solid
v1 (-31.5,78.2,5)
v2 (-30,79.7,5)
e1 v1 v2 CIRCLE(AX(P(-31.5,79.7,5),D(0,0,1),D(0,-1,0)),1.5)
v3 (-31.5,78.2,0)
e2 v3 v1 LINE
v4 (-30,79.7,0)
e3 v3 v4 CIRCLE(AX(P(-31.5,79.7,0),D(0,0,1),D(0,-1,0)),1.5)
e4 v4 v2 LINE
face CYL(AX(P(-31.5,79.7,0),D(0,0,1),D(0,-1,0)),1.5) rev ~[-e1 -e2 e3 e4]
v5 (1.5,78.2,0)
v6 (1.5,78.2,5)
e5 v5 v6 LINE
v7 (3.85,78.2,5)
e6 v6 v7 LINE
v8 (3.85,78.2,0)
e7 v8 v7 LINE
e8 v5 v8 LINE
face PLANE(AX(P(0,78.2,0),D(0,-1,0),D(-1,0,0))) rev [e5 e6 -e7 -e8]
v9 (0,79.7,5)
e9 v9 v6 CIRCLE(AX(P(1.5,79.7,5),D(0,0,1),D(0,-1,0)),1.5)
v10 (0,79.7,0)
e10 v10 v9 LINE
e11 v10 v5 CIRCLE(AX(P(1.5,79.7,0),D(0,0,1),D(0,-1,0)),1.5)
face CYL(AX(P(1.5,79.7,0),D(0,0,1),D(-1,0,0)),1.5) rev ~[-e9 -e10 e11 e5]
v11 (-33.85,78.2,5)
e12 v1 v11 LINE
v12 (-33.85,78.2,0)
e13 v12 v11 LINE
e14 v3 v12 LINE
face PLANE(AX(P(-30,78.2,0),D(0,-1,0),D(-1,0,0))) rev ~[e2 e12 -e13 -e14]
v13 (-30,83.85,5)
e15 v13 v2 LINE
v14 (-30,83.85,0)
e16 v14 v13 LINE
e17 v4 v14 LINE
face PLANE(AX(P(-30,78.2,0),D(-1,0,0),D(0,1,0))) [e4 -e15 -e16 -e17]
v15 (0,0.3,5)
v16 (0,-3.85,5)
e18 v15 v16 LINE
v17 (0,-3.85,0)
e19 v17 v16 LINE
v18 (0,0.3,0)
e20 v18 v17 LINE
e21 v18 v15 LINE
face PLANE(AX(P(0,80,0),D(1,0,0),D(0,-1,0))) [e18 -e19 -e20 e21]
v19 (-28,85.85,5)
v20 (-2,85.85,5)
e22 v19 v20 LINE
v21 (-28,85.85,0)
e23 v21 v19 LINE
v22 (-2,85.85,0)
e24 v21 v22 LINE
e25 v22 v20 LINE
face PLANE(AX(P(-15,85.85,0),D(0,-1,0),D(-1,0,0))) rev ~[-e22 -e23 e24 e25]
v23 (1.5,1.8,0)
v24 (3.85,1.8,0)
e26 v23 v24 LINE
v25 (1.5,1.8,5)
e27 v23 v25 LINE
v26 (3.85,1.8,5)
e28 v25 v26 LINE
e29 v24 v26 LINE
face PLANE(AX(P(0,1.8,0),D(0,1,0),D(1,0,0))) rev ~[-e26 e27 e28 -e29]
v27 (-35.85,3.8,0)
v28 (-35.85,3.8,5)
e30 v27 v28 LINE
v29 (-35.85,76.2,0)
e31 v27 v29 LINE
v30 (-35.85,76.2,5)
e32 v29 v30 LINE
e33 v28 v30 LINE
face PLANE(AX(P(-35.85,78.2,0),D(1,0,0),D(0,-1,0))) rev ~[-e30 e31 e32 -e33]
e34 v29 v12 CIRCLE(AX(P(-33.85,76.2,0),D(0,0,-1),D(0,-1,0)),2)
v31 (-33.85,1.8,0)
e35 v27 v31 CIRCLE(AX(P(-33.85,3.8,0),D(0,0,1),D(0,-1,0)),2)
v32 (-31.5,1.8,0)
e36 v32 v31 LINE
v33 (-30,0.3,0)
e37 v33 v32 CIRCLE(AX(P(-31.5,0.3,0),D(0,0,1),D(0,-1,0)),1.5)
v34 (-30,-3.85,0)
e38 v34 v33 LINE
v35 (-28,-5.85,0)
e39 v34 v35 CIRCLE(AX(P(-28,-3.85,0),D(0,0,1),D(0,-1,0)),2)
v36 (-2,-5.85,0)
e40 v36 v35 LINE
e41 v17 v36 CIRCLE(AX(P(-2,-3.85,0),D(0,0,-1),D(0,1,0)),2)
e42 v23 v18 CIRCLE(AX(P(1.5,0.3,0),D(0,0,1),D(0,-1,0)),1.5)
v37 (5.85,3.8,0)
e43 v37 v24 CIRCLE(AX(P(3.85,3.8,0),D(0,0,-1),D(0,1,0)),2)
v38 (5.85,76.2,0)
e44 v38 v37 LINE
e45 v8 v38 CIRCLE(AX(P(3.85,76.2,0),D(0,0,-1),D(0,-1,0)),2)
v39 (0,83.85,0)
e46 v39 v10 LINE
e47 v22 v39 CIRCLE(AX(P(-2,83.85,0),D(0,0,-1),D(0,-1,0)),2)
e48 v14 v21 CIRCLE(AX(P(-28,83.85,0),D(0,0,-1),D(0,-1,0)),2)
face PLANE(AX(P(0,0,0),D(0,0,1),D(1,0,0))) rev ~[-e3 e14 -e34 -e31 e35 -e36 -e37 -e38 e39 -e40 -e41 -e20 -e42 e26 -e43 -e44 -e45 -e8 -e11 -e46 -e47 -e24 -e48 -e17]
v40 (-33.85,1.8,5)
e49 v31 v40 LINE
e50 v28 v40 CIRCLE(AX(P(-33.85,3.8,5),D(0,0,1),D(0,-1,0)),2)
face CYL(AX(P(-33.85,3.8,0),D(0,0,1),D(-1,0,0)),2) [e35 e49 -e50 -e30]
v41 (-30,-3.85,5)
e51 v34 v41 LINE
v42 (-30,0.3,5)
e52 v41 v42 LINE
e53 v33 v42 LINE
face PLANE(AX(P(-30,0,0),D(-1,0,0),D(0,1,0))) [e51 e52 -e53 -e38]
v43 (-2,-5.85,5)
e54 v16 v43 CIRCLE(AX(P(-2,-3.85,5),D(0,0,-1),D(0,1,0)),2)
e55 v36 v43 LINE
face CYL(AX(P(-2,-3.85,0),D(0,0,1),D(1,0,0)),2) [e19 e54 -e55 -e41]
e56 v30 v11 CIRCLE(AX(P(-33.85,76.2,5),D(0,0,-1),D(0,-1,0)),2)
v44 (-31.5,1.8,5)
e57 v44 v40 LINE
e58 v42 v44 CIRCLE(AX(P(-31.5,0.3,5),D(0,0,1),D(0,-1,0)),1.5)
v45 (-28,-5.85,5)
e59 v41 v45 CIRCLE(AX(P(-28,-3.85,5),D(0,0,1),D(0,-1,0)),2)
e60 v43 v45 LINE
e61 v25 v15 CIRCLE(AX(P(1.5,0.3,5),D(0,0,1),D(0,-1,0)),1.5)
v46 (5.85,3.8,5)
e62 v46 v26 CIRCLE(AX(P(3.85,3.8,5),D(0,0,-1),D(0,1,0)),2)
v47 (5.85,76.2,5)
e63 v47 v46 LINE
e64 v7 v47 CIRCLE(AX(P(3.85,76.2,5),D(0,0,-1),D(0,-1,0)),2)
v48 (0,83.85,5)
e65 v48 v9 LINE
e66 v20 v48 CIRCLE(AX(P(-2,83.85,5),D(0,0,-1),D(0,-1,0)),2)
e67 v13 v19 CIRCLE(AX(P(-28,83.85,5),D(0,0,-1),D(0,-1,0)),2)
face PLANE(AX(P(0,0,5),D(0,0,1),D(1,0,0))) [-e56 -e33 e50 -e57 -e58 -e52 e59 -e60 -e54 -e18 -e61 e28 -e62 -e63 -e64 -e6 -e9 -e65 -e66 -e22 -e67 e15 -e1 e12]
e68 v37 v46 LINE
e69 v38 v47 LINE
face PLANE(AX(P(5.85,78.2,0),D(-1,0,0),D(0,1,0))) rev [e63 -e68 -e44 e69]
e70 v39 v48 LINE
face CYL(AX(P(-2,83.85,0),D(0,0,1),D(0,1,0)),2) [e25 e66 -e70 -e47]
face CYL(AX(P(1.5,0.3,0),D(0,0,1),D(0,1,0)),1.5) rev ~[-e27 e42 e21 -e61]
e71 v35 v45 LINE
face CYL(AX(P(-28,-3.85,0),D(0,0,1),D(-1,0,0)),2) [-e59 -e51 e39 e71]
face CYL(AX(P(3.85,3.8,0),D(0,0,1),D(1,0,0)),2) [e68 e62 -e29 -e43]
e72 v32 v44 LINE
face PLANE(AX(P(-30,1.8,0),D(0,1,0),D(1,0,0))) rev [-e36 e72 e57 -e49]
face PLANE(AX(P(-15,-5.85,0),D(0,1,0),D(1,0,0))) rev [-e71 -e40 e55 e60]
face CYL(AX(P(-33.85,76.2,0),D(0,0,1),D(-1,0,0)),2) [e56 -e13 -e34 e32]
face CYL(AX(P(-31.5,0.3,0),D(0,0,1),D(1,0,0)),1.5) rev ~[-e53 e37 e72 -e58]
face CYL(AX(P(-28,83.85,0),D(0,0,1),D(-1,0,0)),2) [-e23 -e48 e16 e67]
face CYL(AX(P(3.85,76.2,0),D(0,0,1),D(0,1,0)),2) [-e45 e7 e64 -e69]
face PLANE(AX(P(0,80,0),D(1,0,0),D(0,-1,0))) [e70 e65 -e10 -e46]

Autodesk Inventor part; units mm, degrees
ref_plane "YZ Plane" through (0, 0, 0) normal (1, 0, 0) x (0, 1, 0)
ref_plane "XZ Plane" through (0, 0, 0) normal (0, 1, 0) x (-1, 0, 0)
ref_plane "XY Plane" through (0, 0, 0) normal (0, 0, 1) x (1, 0, 0)
sketch "Skizze3" plane through (0, 0, 0) normal (0, 0, 1) x (1, 0, 0)
  line L0 (0, 0) -> (-30, 0)
  line L1 (-30, 0) -> (-30, 80)
  line L2 (-30, 80) -> (0, 80)
  line L3 (0, 80) -> (0, 0)
  line L4 (-30, 78.2) -> (-35.85, 78.2)
  line L5 (-35.85, 78.2) -> (-35.85, 40)
  line L6 (-35.85, 40) -> (-30, 40)
  line L7 (-30, 40) -> (-30, 78.2)
  line L8 (-30, 80) -> (-15, 80)
  line L9 (-15, 80) -> (-15, 85.85)
  line L10 (-15, 85.85) -> (-30, 85.85)
  line L11 (-30, 85.85) -> (-30, 80)
  point P0 (-30, 40)
  point P1 (-15, 80)
  dimension "d4" = 80
  dimension "d5" = 30
  dimension "d6" = 5.85
  dimension "d7" = 5.85
  dimension "d8" = 1.8
extrude "Extrusion3" add sketch "Skizze3" along normal blind 5 contours L0 L1 L2 L3
extrude "Extrusion4" add sketch "Skizze3" along normal blind 5 contours L6 L5 L4 L1 | L2 L11 L10 L9
fillet "Rundung1" radius 2 2 edges at (-35.85, 78.2, 2.5) (-30, 85.85, 2.5)
mirror "Spiegeln1" about plane through (-15, 80, 0) normal (1, 0, 0) of "Extrusion4", "Rundung1"
mirror "Spiegeln2" about plane through (5.85, 40, 0) normal (0, -1, 0) of "Extrusion4", "Rundung1", "Spiegeln1"
fillet "Rundung2" radius 1.5 4 edges at (0, 78.2, 2.5) (-30, 78.2, 2.5) (-30, 1.8, 2.5) (0, 1.8, 2.5)
equation "\"d7\" = d6"
properties part number "BT705_trajan20_21" material "Acryl"
